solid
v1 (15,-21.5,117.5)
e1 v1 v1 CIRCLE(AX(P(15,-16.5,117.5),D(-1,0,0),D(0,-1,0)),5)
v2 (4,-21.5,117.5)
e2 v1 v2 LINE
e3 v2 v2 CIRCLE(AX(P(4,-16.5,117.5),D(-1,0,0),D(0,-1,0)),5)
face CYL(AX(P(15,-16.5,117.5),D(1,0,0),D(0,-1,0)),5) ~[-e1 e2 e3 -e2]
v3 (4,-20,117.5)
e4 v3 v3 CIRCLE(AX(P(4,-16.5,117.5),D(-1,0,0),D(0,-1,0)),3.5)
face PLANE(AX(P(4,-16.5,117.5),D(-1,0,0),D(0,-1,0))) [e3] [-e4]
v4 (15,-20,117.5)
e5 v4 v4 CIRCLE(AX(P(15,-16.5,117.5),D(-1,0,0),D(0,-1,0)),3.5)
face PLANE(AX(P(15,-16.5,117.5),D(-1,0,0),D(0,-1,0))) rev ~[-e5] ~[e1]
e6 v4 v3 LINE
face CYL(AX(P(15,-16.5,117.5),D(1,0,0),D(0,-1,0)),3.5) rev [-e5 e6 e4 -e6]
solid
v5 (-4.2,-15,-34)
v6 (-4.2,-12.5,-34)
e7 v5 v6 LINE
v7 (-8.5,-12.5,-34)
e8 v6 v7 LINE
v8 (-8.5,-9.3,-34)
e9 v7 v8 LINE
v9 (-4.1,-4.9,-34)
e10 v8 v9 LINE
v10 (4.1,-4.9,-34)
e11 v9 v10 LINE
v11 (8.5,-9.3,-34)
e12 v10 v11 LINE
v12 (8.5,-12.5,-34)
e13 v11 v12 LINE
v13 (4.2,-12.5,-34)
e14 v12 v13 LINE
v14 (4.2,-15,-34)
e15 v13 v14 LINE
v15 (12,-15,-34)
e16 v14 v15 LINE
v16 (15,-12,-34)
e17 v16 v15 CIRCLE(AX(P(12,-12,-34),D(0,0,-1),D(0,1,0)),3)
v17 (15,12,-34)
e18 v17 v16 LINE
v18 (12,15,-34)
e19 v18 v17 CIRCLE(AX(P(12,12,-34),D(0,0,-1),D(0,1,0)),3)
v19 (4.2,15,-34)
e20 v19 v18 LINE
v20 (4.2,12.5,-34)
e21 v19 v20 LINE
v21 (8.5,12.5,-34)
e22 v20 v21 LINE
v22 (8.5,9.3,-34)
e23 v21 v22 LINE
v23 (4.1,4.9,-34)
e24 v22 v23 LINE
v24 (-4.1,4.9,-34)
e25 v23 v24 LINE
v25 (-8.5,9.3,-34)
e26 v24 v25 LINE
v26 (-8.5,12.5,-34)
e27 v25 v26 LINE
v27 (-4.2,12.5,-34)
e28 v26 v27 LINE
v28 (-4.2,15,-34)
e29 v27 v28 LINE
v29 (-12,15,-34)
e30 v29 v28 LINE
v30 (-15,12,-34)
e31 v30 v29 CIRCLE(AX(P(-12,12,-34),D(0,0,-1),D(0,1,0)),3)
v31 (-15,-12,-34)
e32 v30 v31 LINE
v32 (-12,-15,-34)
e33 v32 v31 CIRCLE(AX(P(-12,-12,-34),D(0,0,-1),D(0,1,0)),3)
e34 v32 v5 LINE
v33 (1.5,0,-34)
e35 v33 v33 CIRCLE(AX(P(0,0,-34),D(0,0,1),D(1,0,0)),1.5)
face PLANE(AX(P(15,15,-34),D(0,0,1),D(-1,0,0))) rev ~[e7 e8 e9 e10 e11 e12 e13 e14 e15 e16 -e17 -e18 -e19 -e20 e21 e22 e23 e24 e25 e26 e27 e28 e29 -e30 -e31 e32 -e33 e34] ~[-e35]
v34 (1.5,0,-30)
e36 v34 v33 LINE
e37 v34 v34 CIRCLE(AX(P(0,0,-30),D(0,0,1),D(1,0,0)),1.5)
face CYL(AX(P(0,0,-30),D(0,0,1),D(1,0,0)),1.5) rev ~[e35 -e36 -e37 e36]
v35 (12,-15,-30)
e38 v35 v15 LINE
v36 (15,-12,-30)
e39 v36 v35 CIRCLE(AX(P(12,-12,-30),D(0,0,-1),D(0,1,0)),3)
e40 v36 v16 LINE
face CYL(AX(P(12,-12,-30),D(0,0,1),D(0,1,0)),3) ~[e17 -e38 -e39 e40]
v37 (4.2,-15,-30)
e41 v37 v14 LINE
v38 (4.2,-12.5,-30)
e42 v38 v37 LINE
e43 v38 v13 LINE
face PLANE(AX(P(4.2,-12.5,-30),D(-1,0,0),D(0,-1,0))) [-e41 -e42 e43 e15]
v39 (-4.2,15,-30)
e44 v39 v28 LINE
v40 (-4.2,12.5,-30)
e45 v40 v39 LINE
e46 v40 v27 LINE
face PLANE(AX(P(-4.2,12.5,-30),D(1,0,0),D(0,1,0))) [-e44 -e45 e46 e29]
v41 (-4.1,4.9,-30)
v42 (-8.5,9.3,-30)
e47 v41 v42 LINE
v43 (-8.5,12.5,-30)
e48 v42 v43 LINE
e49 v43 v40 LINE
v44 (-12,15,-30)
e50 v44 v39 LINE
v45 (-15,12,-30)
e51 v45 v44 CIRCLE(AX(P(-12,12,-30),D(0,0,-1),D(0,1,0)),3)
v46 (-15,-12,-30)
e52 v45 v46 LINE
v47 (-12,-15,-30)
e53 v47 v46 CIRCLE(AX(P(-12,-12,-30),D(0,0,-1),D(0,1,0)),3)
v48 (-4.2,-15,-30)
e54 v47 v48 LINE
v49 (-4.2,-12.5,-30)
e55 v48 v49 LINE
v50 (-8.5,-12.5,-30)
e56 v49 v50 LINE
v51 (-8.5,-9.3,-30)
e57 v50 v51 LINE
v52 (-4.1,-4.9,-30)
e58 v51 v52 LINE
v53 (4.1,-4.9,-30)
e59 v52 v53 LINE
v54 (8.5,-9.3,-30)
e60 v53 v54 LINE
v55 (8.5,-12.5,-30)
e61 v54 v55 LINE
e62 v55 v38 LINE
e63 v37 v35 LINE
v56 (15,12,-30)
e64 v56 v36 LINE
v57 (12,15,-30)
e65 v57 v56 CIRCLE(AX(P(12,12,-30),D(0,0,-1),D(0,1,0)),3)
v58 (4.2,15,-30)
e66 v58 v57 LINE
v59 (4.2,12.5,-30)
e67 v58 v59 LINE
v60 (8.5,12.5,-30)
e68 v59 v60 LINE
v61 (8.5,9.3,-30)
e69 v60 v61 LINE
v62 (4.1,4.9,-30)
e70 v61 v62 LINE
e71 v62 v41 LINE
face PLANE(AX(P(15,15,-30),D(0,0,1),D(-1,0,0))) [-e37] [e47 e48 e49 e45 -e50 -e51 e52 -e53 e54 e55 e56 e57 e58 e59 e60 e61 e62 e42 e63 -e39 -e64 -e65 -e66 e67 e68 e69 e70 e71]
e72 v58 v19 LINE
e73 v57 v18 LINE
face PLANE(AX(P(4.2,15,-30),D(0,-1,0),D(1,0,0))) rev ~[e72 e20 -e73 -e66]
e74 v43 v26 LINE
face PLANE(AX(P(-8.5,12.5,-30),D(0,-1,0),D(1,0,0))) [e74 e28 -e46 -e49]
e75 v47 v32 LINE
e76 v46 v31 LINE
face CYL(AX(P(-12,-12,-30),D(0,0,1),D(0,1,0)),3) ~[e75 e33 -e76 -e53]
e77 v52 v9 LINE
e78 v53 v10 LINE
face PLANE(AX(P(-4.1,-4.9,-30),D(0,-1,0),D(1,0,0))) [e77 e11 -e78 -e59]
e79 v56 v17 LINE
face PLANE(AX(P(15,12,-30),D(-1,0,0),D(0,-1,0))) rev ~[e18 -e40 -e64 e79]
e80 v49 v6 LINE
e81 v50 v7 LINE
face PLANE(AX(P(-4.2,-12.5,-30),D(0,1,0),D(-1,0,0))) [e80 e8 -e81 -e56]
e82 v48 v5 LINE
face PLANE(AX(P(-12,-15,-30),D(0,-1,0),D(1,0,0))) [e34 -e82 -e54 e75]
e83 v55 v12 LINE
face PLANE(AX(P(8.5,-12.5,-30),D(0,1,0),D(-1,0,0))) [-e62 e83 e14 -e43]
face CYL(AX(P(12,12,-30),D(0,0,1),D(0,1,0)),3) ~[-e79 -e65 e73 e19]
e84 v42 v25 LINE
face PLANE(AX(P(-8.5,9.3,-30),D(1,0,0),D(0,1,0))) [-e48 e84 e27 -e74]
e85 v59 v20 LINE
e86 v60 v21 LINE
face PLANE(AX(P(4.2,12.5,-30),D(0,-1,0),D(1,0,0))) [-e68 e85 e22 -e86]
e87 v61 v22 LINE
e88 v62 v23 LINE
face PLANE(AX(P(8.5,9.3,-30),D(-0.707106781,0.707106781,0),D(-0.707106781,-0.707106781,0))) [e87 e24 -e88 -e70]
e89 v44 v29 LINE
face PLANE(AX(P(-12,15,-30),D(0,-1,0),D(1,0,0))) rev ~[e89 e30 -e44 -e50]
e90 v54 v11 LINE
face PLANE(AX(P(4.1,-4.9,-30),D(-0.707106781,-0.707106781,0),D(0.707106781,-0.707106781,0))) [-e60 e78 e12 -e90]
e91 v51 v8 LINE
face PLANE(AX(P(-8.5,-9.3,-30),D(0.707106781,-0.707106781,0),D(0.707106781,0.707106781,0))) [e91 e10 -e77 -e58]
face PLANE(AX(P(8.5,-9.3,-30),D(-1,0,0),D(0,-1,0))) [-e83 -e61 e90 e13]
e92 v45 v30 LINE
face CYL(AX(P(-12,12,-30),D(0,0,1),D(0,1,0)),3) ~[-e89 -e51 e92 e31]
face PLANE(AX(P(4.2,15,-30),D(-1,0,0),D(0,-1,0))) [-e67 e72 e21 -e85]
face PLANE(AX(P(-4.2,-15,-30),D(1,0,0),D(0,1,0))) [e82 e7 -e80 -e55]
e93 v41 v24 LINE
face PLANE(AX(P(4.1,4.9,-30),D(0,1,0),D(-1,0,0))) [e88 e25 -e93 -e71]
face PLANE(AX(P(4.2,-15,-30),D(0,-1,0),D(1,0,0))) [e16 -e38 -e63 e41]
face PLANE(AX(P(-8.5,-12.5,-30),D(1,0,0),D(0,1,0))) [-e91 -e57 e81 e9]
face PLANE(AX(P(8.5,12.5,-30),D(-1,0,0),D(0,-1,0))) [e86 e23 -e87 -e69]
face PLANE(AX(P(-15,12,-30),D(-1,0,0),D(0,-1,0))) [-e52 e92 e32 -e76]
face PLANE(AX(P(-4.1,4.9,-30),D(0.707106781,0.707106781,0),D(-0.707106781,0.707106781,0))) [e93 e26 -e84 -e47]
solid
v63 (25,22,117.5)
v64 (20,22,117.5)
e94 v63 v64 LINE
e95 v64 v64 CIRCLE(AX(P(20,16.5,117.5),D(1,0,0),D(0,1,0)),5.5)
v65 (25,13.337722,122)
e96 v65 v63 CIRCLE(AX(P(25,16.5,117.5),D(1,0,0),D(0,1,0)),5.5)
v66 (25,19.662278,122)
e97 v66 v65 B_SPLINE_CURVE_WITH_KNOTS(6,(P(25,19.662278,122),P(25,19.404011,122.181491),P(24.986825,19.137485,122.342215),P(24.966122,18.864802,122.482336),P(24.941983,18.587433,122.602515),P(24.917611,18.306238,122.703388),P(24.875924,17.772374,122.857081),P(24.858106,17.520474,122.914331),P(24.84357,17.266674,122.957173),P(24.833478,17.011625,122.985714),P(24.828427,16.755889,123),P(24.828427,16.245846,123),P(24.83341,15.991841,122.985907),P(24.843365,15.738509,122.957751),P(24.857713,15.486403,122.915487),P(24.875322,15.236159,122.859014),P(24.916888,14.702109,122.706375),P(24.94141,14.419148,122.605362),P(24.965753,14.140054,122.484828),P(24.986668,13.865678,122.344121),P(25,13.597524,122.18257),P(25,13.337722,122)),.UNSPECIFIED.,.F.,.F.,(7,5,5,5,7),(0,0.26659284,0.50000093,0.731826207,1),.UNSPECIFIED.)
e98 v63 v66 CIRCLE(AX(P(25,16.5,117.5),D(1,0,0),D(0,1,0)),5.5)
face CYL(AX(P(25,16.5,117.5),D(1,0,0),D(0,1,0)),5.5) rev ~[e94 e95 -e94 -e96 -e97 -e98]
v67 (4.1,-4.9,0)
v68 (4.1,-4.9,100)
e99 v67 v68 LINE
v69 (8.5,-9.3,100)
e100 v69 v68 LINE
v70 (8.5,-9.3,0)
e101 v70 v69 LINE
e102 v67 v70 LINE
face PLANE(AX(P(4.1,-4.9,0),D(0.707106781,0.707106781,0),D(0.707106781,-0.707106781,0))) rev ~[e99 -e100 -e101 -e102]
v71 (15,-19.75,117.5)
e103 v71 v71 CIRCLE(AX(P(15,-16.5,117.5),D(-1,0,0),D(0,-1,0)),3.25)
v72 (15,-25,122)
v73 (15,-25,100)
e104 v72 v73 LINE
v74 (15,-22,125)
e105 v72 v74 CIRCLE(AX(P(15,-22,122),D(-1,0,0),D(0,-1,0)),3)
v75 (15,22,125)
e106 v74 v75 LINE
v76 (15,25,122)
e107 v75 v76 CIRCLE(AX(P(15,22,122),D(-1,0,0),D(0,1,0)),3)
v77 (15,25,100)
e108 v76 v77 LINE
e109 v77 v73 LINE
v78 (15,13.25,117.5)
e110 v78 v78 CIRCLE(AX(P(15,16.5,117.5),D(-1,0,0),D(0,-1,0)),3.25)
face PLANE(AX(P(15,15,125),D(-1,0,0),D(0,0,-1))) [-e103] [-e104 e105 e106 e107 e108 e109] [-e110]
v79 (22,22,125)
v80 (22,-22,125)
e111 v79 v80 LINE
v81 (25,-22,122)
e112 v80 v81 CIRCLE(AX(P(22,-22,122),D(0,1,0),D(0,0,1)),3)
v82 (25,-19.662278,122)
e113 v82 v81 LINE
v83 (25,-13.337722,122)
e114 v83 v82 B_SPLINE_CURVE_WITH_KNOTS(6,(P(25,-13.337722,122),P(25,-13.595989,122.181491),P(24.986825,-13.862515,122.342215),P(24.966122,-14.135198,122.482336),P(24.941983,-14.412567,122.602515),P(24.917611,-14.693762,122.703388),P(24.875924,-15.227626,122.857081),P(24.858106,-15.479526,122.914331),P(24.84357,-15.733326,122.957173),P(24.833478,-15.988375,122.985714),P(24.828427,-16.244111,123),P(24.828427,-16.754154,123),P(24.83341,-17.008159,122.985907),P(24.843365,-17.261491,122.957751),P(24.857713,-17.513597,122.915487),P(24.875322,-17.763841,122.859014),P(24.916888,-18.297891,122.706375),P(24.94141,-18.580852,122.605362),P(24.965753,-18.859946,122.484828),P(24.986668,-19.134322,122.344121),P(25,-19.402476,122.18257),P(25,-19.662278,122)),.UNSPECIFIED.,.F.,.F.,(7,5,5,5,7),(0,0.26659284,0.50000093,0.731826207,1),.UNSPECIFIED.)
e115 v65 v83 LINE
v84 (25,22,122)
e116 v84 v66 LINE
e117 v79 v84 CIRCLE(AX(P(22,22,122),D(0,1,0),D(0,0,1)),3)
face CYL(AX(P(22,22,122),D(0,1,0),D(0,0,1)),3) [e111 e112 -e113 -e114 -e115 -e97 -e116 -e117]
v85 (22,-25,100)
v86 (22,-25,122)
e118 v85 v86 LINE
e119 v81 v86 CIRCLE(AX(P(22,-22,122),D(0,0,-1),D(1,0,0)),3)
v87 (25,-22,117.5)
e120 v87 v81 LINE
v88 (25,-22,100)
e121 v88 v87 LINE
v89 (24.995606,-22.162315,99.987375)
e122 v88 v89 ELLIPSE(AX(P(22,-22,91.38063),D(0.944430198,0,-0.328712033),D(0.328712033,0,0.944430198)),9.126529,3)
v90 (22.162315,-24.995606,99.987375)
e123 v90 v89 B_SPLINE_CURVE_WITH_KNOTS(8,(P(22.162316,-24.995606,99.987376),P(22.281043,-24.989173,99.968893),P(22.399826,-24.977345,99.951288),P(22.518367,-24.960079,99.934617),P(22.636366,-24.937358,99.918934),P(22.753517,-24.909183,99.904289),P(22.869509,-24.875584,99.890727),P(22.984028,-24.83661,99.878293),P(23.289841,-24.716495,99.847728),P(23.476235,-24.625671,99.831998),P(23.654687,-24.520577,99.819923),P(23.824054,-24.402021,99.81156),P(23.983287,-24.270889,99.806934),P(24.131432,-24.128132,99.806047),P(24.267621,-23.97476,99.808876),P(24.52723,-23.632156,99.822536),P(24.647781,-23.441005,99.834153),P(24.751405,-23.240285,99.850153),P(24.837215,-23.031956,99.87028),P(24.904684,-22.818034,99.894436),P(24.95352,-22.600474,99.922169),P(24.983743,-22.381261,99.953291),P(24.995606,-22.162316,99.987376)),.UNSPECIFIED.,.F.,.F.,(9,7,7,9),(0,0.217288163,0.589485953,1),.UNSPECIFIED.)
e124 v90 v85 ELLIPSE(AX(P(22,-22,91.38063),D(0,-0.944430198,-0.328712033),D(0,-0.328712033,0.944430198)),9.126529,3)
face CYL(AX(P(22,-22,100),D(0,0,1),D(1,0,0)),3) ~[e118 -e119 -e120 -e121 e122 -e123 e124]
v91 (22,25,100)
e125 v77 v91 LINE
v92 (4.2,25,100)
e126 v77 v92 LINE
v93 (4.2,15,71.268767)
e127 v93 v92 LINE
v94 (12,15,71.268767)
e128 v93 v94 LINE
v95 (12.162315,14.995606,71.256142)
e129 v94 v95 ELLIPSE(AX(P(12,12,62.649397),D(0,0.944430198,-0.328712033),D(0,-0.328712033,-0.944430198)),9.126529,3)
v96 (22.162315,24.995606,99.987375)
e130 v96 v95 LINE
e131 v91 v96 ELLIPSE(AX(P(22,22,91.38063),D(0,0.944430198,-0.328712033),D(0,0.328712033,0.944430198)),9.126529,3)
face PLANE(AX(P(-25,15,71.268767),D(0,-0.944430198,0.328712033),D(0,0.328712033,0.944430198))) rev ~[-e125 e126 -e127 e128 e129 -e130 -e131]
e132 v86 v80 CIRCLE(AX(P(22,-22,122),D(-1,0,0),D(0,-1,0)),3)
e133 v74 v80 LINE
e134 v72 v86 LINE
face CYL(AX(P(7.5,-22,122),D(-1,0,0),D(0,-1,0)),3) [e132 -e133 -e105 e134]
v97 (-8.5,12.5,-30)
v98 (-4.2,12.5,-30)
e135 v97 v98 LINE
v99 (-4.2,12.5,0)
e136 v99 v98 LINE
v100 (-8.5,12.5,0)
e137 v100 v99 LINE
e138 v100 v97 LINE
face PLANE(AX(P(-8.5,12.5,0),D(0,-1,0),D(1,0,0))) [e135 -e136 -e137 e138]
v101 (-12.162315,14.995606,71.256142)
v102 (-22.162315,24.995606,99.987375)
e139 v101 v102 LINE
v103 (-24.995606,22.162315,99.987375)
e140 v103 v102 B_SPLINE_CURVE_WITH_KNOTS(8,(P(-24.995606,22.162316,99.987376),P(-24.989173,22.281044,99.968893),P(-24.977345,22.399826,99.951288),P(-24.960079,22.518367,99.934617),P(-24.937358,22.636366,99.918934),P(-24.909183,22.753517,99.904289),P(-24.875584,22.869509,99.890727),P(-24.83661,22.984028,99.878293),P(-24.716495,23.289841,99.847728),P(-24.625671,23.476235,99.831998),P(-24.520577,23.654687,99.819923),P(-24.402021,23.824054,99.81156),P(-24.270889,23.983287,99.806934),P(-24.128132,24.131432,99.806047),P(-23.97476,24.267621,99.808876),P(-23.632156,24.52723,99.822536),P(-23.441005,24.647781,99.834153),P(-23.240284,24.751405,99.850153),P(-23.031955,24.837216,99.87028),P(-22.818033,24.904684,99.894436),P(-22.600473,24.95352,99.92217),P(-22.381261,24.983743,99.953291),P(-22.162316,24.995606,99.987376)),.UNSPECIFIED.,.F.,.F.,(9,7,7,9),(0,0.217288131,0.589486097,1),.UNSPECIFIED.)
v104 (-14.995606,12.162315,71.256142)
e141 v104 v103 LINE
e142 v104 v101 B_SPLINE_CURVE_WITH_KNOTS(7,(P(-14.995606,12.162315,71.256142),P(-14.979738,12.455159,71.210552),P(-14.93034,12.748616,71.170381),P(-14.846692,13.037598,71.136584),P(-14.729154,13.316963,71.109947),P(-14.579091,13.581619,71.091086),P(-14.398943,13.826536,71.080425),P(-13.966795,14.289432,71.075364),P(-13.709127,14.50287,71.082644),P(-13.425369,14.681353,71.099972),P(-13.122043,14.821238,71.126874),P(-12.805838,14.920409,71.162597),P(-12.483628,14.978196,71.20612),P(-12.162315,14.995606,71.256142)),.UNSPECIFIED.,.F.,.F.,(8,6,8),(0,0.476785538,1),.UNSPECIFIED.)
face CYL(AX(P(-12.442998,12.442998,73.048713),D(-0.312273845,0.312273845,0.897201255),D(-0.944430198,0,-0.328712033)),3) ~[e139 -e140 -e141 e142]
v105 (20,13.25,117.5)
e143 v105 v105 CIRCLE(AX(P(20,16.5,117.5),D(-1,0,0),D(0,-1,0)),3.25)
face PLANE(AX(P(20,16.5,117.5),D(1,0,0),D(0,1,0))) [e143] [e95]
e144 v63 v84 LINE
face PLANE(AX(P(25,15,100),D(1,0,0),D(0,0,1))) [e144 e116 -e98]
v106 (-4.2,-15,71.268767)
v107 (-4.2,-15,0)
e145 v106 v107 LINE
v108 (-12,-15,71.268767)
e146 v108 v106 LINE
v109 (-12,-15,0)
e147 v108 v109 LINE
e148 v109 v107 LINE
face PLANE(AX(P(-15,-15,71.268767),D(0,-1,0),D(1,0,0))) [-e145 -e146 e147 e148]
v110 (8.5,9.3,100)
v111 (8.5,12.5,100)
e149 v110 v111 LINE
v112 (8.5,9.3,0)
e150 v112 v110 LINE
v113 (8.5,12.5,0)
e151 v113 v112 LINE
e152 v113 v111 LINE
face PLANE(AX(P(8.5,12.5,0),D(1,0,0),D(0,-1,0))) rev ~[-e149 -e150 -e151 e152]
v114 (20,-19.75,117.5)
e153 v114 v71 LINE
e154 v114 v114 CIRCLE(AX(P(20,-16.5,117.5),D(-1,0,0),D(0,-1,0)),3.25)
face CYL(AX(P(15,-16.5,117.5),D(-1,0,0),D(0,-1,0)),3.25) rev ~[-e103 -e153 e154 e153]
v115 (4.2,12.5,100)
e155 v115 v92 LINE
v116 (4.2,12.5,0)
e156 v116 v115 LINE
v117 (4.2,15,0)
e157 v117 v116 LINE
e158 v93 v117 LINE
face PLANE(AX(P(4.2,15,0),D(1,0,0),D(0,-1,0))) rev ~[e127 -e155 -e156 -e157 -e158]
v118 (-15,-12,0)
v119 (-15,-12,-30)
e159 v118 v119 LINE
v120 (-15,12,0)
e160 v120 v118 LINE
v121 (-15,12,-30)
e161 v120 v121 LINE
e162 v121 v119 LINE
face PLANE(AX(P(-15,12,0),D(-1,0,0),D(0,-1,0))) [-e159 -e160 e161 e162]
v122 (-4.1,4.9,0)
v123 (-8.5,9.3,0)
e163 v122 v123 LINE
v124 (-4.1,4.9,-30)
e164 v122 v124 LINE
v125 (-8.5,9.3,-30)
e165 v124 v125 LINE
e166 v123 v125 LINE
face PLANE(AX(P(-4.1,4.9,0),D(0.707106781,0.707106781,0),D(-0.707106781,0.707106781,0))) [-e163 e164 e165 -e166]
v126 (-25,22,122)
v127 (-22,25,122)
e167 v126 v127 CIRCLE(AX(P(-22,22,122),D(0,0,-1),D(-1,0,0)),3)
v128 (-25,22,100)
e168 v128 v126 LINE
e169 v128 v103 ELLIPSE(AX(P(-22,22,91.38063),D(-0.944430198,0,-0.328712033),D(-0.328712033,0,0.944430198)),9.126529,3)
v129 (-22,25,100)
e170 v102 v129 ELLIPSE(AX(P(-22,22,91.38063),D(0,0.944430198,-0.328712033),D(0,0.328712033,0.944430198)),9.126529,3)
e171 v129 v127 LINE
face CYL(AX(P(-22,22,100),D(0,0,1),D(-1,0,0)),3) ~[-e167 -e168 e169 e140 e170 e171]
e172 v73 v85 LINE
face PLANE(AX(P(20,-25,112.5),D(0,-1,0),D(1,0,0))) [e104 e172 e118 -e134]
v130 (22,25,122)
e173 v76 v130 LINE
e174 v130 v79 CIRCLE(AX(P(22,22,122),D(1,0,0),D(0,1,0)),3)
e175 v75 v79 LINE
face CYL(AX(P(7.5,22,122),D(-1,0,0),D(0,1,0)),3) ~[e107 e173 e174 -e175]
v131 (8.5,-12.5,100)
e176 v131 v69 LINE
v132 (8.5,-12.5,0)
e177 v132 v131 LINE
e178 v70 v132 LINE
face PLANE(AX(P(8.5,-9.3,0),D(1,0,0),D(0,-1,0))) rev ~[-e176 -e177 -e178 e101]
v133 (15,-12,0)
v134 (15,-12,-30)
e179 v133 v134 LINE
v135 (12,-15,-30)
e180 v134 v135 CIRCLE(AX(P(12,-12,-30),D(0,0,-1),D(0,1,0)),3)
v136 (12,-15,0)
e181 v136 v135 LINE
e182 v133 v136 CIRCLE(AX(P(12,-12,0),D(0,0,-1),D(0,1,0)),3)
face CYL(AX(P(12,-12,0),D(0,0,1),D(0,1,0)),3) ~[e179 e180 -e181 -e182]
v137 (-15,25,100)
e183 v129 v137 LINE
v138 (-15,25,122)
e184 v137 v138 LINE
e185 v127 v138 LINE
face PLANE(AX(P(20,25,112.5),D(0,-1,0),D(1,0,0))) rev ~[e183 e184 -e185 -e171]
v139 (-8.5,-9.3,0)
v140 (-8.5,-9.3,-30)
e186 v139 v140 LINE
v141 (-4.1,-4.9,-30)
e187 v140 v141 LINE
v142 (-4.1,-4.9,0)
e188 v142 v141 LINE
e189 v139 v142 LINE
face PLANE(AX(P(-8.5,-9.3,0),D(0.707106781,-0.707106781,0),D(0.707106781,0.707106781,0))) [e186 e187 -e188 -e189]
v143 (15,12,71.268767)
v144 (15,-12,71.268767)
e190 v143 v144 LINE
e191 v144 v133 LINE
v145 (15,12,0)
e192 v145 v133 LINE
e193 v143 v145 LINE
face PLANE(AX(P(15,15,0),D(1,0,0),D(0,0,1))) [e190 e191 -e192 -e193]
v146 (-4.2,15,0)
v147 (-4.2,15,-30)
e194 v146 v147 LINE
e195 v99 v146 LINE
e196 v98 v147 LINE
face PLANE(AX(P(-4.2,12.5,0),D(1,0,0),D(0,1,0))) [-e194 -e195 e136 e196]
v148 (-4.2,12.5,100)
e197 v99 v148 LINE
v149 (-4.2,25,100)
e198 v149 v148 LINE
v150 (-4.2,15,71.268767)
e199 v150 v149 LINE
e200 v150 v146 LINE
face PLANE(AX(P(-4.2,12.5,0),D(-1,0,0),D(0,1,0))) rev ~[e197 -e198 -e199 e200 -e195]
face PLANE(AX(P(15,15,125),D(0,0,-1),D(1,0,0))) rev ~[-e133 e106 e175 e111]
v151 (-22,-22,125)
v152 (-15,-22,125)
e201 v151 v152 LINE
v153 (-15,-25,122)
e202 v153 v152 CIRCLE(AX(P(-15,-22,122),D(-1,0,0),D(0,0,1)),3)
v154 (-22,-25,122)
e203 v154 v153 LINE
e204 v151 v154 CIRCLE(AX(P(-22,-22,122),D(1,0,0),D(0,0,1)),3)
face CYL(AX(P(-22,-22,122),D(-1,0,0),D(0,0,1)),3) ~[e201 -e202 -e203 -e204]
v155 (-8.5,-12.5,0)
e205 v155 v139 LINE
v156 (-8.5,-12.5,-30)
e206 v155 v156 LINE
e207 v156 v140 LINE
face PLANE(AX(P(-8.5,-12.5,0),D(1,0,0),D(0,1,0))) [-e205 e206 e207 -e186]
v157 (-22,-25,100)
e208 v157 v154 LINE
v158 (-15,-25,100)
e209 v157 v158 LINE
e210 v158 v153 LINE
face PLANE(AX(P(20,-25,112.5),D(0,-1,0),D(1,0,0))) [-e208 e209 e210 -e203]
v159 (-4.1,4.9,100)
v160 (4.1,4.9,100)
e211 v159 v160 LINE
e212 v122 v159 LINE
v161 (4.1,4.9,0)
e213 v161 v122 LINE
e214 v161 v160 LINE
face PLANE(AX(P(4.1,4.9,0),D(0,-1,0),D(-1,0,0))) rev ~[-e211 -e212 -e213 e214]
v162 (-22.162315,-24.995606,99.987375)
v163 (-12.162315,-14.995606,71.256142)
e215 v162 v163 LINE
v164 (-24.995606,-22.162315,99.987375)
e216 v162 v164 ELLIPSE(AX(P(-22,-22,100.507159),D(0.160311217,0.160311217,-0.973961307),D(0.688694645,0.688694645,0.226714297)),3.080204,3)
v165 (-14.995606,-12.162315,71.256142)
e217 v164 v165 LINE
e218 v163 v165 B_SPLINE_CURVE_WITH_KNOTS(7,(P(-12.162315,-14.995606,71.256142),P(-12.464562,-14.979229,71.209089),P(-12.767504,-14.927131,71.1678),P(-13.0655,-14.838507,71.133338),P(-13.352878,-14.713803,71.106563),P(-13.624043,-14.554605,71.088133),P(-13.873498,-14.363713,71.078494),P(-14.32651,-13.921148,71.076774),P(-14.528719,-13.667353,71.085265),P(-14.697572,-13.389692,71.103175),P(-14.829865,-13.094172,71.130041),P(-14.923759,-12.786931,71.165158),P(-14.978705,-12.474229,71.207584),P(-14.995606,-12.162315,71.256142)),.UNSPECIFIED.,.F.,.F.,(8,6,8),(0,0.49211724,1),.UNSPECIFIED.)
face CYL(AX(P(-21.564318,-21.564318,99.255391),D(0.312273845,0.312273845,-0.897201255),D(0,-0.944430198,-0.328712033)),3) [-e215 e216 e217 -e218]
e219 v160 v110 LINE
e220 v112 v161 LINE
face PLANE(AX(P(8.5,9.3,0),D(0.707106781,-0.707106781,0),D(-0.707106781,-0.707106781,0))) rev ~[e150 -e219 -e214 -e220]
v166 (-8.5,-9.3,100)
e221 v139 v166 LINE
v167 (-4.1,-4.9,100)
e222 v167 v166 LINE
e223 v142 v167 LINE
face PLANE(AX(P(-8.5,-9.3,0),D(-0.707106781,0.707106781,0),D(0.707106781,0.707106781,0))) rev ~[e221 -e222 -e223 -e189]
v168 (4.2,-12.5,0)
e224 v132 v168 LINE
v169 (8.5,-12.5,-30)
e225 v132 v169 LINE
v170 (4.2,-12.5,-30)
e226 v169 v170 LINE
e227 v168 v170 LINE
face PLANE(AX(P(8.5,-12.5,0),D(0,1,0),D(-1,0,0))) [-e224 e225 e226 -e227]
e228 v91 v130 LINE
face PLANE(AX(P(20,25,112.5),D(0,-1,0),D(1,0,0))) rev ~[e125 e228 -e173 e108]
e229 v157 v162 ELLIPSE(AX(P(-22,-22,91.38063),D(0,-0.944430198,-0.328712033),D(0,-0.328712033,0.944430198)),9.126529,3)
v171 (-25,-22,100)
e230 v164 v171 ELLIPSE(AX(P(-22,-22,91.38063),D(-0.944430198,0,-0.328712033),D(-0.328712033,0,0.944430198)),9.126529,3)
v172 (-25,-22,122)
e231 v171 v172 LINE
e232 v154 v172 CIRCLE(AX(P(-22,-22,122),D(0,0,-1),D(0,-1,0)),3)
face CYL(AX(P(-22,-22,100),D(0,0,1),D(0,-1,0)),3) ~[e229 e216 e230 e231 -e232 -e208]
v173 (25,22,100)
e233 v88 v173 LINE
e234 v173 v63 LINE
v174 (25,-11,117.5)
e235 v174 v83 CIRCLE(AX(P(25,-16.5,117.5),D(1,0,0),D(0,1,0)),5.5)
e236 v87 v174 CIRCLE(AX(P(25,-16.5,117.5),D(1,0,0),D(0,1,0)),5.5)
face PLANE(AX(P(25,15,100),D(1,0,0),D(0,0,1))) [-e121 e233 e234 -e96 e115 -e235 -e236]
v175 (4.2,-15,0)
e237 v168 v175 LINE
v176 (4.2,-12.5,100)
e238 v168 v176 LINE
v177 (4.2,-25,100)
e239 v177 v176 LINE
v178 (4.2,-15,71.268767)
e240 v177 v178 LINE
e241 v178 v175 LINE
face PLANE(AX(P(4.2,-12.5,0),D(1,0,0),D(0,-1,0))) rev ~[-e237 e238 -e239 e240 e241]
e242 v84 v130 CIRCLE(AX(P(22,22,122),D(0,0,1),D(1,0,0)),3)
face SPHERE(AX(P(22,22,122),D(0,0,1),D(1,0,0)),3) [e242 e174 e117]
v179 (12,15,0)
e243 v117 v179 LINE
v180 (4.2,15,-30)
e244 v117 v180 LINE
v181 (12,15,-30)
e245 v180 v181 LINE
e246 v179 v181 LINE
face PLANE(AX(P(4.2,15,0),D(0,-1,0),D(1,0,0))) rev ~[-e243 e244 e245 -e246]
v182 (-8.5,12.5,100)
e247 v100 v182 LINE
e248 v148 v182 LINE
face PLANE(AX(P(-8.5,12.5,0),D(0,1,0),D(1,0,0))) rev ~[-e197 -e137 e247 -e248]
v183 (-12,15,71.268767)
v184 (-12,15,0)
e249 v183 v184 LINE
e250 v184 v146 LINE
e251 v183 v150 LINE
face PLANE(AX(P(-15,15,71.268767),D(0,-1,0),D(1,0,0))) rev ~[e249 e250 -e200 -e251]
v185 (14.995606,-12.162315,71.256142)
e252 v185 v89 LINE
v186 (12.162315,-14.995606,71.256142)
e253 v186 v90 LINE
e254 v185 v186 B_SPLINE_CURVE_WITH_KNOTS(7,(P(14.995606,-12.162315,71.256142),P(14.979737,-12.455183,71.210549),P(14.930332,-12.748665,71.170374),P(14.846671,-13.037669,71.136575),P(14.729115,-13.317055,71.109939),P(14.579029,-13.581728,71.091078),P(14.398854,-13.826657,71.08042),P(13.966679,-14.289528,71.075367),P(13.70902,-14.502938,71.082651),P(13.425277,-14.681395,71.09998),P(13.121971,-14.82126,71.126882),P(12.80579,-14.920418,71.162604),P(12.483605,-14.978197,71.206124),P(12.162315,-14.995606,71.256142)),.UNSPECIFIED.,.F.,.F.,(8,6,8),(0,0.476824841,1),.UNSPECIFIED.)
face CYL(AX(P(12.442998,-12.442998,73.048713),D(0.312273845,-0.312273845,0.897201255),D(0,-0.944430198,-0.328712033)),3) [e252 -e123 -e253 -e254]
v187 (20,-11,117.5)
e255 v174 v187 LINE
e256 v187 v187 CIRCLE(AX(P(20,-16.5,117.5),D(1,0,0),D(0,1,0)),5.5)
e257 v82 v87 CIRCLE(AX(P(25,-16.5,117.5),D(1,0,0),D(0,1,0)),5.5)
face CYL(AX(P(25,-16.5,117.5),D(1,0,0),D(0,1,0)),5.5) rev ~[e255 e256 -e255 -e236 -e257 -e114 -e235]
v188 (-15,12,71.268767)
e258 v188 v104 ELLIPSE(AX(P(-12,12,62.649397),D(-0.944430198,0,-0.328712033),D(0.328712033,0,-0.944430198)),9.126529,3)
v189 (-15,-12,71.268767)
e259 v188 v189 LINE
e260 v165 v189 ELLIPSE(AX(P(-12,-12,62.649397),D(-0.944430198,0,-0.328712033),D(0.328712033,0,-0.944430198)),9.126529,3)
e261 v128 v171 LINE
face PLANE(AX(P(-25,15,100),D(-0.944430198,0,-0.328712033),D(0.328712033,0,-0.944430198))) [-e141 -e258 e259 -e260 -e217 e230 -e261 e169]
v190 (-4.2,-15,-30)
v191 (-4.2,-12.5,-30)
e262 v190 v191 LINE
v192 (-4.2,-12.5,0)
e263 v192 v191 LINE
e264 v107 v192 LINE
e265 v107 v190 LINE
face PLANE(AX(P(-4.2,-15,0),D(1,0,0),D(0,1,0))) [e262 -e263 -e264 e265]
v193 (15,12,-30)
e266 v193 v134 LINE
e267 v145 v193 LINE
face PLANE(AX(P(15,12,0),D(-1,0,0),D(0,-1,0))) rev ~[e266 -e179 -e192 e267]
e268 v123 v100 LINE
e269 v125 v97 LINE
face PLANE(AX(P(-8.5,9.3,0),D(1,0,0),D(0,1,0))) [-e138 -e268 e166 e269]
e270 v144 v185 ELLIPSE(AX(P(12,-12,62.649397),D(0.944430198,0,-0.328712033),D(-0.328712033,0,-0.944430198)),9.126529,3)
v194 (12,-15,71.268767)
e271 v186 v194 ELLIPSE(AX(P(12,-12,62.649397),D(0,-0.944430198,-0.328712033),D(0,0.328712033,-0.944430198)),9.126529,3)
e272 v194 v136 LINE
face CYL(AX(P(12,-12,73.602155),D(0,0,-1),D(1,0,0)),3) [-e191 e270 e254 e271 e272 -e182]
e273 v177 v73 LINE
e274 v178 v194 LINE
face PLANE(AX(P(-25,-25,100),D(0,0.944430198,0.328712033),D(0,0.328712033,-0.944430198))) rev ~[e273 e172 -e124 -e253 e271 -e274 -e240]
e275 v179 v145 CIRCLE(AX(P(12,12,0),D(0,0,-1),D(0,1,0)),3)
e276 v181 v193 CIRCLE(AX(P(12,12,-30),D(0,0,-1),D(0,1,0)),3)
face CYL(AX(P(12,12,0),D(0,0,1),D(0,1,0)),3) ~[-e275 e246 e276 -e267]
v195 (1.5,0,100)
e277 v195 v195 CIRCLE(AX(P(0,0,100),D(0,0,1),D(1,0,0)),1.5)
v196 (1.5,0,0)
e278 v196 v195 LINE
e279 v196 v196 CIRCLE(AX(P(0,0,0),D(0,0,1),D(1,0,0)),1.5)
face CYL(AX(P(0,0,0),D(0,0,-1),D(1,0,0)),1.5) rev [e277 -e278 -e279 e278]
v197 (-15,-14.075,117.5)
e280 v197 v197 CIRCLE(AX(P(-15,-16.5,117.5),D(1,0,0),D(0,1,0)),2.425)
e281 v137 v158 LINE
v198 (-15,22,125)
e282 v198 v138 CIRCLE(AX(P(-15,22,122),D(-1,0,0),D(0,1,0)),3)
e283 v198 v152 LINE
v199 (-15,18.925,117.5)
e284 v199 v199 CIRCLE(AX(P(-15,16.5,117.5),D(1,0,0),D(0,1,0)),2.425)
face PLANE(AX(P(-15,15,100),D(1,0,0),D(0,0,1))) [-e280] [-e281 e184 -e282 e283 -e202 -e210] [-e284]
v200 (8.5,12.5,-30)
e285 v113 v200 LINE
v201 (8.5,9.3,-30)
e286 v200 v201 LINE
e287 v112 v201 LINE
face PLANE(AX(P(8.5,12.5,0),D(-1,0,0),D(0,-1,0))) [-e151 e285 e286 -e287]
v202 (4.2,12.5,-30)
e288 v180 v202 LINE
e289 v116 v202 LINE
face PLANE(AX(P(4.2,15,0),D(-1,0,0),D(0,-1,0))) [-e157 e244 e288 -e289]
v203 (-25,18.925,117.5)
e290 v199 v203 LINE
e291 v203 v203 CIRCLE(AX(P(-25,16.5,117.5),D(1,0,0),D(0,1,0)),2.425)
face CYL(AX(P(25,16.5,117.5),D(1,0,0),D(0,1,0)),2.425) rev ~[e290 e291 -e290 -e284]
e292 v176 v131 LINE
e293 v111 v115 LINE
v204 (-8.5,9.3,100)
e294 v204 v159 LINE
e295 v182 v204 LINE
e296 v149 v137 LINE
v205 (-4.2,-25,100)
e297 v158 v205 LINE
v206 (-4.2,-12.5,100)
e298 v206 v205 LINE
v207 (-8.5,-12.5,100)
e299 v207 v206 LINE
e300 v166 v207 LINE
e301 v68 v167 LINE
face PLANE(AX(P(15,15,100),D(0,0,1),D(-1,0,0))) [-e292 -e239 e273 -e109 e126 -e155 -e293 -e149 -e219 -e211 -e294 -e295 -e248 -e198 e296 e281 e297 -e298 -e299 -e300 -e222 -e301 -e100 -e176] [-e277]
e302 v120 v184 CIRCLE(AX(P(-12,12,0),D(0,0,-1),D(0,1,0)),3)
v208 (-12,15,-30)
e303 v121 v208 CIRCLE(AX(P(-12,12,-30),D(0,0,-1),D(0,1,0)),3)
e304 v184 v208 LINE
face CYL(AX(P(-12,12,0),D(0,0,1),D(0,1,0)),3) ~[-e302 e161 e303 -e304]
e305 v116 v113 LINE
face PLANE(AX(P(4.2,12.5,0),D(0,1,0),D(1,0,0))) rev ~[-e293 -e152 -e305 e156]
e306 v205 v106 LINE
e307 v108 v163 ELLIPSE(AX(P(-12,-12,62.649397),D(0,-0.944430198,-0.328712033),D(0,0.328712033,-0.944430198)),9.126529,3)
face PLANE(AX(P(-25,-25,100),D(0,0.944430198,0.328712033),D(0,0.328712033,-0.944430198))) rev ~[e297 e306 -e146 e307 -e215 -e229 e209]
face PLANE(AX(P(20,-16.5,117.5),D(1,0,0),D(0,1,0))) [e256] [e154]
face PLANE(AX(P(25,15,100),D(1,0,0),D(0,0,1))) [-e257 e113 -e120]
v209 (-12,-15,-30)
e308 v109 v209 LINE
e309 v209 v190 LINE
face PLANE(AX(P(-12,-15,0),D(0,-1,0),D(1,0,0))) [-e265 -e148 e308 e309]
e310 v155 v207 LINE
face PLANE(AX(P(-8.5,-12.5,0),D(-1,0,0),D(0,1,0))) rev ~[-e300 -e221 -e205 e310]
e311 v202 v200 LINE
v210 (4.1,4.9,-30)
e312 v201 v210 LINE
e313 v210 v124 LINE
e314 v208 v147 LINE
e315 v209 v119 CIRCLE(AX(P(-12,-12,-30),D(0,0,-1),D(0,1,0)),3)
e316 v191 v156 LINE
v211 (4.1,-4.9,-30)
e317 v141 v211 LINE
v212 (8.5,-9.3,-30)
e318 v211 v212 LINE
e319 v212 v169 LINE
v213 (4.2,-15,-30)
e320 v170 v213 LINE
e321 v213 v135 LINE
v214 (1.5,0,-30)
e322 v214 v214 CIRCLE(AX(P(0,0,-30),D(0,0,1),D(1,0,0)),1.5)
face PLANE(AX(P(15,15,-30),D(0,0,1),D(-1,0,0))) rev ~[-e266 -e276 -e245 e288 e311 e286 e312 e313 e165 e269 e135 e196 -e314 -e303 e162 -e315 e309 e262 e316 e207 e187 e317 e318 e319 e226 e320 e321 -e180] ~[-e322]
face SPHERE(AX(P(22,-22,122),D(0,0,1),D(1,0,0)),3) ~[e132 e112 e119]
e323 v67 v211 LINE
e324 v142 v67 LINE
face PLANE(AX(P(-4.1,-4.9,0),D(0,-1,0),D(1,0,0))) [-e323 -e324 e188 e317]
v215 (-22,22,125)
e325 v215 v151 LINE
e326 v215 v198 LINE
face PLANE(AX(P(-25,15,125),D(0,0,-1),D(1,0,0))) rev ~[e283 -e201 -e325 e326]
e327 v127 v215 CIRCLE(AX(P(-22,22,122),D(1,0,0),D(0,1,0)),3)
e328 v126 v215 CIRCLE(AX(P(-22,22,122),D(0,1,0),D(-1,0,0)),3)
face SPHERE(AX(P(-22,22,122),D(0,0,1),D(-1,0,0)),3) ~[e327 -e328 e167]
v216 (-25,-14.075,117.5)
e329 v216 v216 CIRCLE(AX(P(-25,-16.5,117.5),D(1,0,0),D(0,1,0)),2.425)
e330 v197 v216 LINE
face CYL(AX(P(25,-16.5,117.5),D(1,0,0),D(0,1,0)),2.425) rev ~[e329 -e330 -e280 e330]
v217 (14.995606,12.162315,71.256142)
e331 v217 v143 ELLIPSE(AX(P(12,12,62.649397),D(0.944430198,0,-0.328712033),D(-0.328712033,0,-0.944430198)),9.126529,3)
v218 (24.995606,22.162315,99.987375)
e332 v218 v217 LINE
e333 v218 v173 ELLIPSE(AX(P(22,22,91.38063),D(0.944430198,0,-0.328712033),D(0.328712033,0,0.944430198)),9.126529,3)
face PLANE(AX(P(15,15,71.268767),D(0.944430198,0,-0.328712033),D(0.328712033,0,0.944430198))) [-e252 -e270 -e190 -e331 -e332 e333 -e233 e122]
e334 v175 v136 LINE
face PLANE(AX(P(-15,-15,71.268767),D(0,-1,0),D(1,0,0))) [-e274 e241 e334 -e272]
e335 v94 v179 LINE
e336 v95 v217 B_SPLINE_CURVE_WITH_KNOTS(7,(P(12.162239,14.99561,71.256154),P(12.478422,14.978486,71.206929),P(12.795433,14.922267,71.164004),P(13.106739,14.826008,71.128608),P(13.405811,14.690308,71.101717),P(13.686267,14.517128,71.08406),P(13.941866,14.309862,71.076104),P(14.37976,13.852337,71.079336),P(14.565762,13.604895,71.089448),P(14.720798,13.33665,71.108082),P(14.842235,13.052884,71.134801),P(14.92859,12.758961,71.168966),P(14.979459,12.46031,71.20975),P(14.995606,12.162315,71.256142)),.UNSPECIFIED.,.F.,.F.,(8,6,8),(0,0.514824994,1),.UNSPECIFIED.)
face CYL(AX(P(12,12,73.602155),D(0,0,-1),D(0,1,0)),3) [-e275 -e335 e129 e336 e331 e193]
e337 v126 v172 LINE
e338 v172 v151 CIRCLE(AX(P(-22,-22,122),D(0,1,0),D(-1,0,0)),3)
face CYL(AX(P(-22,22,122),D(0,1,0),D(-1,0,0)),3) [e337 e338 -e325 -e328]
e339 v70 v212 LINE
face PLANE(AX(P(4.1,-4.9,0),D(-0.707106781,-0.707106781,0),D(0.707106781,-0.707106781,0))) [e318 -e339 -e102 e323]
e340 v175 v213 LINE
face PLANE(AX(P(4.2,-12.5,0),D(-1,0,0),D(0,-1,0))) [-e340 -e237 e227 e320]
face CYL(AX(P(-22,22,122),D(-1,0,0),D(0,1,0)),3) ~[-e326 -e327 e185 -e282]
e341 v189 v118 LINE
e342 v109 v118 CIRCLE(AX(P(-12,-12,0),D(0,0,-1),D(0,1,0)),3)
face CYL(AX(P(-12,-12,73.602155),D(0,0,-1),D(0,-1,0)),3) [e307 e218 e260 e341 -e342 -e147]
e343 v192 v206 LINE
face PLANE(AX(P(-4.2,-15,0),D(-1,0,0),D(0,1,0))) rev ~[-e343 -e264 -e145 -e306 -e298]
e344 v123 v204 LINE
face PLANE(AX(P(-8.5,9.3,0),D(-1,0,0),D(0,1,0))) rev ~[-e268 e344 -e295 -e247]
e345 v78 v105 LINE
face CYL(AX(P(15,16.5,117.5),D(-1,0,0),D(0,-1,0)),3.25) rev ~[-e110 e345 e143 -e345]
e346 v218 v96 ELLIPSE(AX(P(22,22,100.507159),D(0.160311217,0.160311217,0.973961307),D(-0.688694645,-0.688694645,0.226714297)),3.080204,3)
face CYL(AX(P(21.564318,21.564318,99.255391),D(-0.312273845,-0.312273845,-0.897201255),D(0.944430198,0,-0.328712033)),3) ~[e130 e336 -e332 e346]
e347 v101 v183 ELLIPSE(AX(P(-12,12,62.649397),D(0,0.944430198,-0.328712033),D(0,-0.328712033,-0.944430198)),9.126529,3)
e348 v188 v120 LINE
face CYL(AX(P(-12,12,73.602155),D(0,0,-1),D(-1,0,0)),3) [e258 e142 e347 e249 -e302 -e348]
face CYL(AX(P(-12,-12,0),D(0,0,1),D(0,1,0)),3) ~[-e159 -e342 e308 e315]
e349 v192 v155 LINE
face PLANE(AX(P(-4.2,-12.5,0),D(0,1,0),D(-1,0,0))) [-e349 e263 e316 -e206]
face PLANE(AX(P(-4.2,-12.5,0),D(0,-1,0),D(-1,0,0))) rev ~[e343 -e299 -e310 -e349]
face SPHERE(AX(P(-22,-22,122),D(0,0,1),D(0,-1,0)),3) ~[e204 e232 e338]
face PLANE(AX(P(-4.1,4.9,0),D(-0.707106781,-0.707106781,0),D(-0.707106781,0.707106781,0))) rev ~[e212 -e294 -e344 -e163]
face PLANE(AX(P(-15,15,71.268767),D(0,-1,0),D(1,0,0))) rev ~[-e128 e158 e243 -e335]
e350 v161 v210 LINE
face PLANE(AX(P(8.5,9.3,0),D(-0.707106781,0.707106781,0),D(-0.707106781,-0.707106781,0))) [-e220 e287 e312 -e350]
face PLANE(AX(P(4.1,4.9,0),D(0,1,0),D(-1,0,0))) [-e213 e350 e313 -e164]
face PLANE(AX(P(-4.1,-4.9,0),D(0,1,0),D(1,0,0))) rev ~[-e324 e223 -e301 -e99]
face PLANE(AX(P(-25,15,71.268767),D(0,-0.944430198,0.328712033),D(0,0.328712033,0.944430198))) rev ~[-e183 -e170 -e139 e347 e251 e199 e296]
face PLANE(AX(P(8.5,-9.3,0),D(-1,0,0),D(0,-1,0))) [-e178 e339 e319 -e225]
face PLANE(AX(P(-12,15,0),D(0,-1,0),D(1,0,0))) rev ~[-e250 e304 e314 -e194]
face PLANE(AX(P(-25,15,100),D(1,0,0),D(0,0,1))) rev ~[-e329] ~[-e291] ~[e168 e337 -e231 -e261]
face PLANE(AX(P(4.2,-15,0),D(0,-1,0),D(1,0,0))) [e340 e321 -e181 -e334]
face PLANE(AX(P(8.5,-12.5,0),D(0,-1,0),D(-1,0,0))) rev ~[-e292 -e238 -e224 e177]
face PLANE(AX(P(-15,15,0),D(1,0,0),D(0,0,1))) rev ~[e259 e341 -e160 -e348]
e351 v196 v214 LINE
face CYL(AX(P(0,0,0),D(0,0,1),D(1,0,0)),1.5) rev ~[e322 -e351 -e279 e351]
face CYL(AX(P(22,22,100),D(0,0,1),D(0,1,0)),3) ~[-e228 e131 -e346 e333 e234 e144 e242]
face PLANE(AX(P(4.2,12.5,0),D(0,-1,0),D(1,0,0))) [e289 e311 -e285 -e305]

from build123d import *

# Parameters (mm, degrees)
F0_R          = 1.5
F1_DEPTH      = 100
F2_W          = 10
F2_H          = 25
F3_DEPTH      = 30
F4_DEPTH      = 10
F5_DEPTH      = 10
F7_DEPTH      = 132
F8_DEPTH      = 110
F9_F1_R       = 3
F9_F2_R       = 3
F9_F3_R       = 3
F9_F4_R       = 3
F9_F5_R       = 3
F9_F6_R       = 3
F9_F7_R       = 3
F9_F8_R       = 3
F9_F9_R       = 3
F9_F10_R      = 3
F9_F11_R      = 3
F9_F12_R      = 3
F10_R         = 3.25
F11_DEPTH     = 15
F12_R         = 2.425
F13_DEPTH     = 80
F14_R         = 5.5
F15_DEPTH     = 5
F17_DEPTH     = 124
F18_W         = 8.4
F18_H         = 10
F19_DEPTH     = 30
F20_DEPTH     = 30
F21_T1_DEPTH  = 14.5
F21_T3_DEPTH  = 14.5
F21_T5_DEPTH  = 44
F21_T8_ANGLE  = 90
F21_T10_ANGLE = 90
F21_T12_ANGLE = 90
F21_T14_ANGLE = 90
F22_R         = 5
F22_R_2       = 3.5
F23_DEPTH     = 11
F24_DEPTH     = 4


# Not quite as in the source:
# - a fillet or chamfer that OpenCascade refuses, or shapes differently, is made with other operations: its cross-section is extruded or revolved along the edge and cut away or added


with BuildPart() as f1:
    # F0 (on Top) → F1 (new body)
    with BuildSketch(Plane.XY):
        Polygon((-12, -15), (12, -15), (15, -15), (15, -12), (15, 12), (15, 15), (12, 15), (-12, 15), (-15, 15), (-15, 12), (-15, -12), (-15, -15), align=None)
        Circle(F0_R, mode=Mode.SUBTRACT)
    extrude(amount=F1_DEPTH)

    # F2 (on face) → F3 (join, through all)
    with BuildSketch(Plane.XZ.offset(15)):
        with Locations((20, 112.5)):
            Rectangle(F2_W, F2_H)
        Polygon((25, 100), (15, 100), (15, 71.2687671185), align=None)
        Polygon((-15, 71.2687671185), (-15, 100), (-25, 100), align=None)
        with Locations((-20, 112.5)):
            Rectangle(F2_W, F2_H)
    extrude(amount=-F3_DEPTH)

    # F4 (add): faces of the model
    f4_faces = [f1.faces().sort_by_distance(p)[0] for p in [
        (0, -15, 61.3177895676),
        (0, -15, 61.3177895676),
    ]]
    extrude(f4_faces, amount=F4_DEPTH)

    # F5 (add): faces of the model
    f5_faces = [f1.faces().sort_by_distance(p)[0] for p in [
        (0, 15, 61.3177895676),
        (0, 15, 61.3177895676),
    ]]
    extrude(f5_faces, amount=F5_DEPTH)

    # F6 (on face) → F7 (cut)
    with BuildSketch(Plane(origin=(-25, 0, 0), x_dir=(0, -1, 0), z_dir=(-1, 0, 0))):
        Polygon((25, 100), (15, 71.2687671185), (25, 71.2687671185), align=None)
        Polygon((-25, 71.2687671185), (-15, 71.2687671185), (-25, 100), align=None)
    extrude(amount=-F7_DEPTH, mode=Mode.SUBTRACT)

    # F8 (cut): faces of the model
    f8_faces = [f1.faces().sort_by_distance(p)[0] for p in [
        (0, -20, 71.2687671185),
        (0, 20, 71.2687671185),
    ]]
    extrude(f8_faces, amount=-F8_DEPTH, mode=Mode.SUBTRACT)

    # F9: fillet of radius 3 on 12 edges, made by hand

    # F9_f1
    f9_f1_edges = [f1.edges().sort_by_distance(p)[0] for p in [
        (25, 25, 112.5),
    ]]
    fillet(f9_f1_edges, radius=F9_F1_R)

    # F9_f2
    f9_f2_edges = [f1.edges().sort_by_distance(p)[0] for p in [
        (25, -25, 112.5),
    ]]
    fillet(f9_f2_edges, radius=F9_F2_R)

    # F9_f3
    f9_f3_edges = [f1.edges().sort_by_distance(p)[0] for p in [
        (-25, -25, 112.5),
    ]]
    fillet(f9_f3_edges, radius=F9_F3_R)

    # F9_f4
    f9_f4_edges = [f1.edges().sort_by_distance(p)[0] for p in [
        (-25, 25, 112.5),
    ]]
    fillet(f9_f4_edges, radius=F9_F4_R)

    # F9_f5
    f9_f5_edges = [f1.edges().sort_by_distance(p)[0] for p in [
        (19.5606601718, -19.5606601718, 84.3721060674),
    ]]
    fillet(f9_f5_edges, radius=F9_F5_R)

    # F9_f6
    f9_f6_edges = [f1.edges().sort_by_distance(p)[0] for p in [
        (19.5606601718, 19.5606601718, 84.3721060674),
    ]]
    fillet(f9_f6_edges, radius=F9_F6_R)

    # F9_f7
    f9_f7_edges = [f1.edges().sort_by_distance(p)[0] for p in [
        (-19.5606601718, -19.5606601718, 84.3721060674),
    ]]
    fillet(f9_f7_edges, radius=F9_F7_R)

    # F9_f8
    f9_f8_edges = [f1.edges().sort_by_distance(p)[0] for p in [
        (-19.5606601718, 19.5606601718, 84.3721060674),
    ]]
    fillet(f9_f8_edges, radius=F9_F8_R)

    # F9_f9
    f9_f9_edges = [f1.edges().sort_by_distance(p)[0] for p in [
        (15, 15, 36.8010775644),
    ]]
    fillet(f9_f9_edges, radius=F9_F9_R)

    # F9_f10
    f9_f10_edges = [f1.edges().sort_by_distance(p)[0] for p in [
        (15, -15, 36.8010775644),
    ]]
    fillet(f9_f10_edges, radius=F9_F10_R)

    # F9_f11
    f9_f11_edges = [f1.edges().sort_by_distance(p)[0] for p in [
        (-15, -15, 36.8010775644),
    ]]
    fillet(f9_f11_edges, radius=F9_F11_R)

    # F9_f12
    f9_f12_edges = [f1.edges().sort_by_distance(p)[0] for p in [
        (-15, 15, 36.8010775644),
    ]]
    fillet(f9_f12_edges, radius=F9_F12_R)

    # F10 (on face) → F11 (cut, symmetric)
    with BuildSketch(Plane(origin=(15, 0, 0), x_dir=(0, -1, 0), z_dir=(-1, 0, 0))):
        with Locations((-16.5, 117.5)):
            Circle(F10_R)
        with Locations((16.5, 117.5)):
            Circle(F10_R)
    extrude(amount=F11_DEPTH, both=True, mode=Mode.SUBTRACT)

    # F12 (on face) → F13 (cut)
    with BuildSketch(Plane.YZ.offset(25)):
        with Locations((16.5, 117.5)):
            Circle(F12_R)
        with Locations((-16.5, 117.5)):
            Circle(F12_R)
    extrude(amount=-F13_DEPTH, mode=Mode.SUBTRACT)

    # F14 (on face) → F15 (cut)
    with BuildSketch(Plane.YZ.offset(25)):
        with Locations((-16.5, 117.5)):
            Circle(F14_R)
        with Locations((16.5, 117.5)):
            Circle(F14_R)
    extrude(amount=-F15_DEPTH, mode=Mode.SUBTRACT)

    # F16 (on face) → F17 (cut)
    with BuildSketch(Plane(origin=(0, 0, 0), x_dir=(1, 0, 0), z_dir=(0, 0, -1))):
        Polygon((4.2, 15), (0, 15), (-4.2, 15), (-4.2, 12.5), (-8.5, 12.5), (-8.5, 9.3), (-4.1, 4.9), (0, 4.9), (4.1, 4.9), (8.5, 9.3), (8.5, 12.5), (4.2, 12.5), align=None)
        Polygon((-4.2, -12.5), (-4.2, -15), (0, -15), (4.2, -15), (4.2, -12.5), (8.5, -12.5), (8.5, -9.3), (4.1, -4.9), (0, -4.9), (-4.1, -4.9), (-8.5, -9.3), (-8.5, -12.5), align=None)
    extrude(amount=-F17_DEPTH, mode=Mode.SUBTRACT)

    # F18 (on face) → F19 (cut)
    with BuildSketch(Plane.XY.offset(100)):
        with Locations((0, 20)):
            Rectangle(F18_W, F18_H)
        with Locations((0, -20)):
            Rectangle(F18_W, F18_H)
    extrude(amount=-F19_DEPTH, mode=Mode.SUBTRACT)

    # F20 (add): a face of the model
    f20_faces = [f1.faces().sort_by_distance(p)[0] for p in [
        (-13.8213203436, 13.8213203436, 0),
    ]]
    extrude(f20_faces, amount=F20_DEPTH)

    # F21: fillet of radius 3 on 10 edges, made by hand

    # F21_s2 → F21_t1 (cut)
    with BuildSketch(Plane.YZ.offset(-22)):
        with BuildLine():
            ThreePointArc((-22, 125), (-24.1213203436, 124.1213203436), (-25, 122))
            Line((-25, 122), (-25, 125))
            Line((-25, 125), (-22, 125))
        make_face()
        with BuildLine():
            ThreePointArc((25, 122), (24.1213203436, 124.1213203436), (22, 125))
            Line((22, 125), (25, 125))
            Line((25, 125), (25, 122))
        make_face()
    extrude(amount=F21_T1_DEPTH, mode=Mode.SUBTRACT)

    # F21_s4 → F21_t3 (cut)
    with BuildSketch(Plane.YZ.offset(7.5)):
        with BuildLine():
            ThreePointArc((-25, 122), (-24.1213203436, 124.1213203436), (-22, 125))
            Line((-22, 125), (-25, 125))
            Line((-25, 125), (-25, 122))
        make_face()
        with BuildLine():
            ThreePointArc((25, 122), (24.1213203436, 124.1213203436), (22, 125))
            Line((22, 125), (25, 125))
            Line((25, 125), (25, 122))
        make_face()
    extrude(amount=F21_T3_DEPTH, mode=Mode.SUBTRACT)

    # F21_s6 → F21_t5 (cut)
    with BuildSketch(Plane.XZ.offset(-22)):
        with BuildLine():
            ThreePointArc((-25, 122), (-24.1213203436, 124.1213203436), (-22, 125))
            Line((-22, 125), (-25, 125))
            Line((-25, 125), (-25, 122))
        make_face()
        with BuildLine():
            ThreePointArc((22, 125), (24.1213203436, 124.1213203436), (25, 122))
            Line((25, 122), (25, 125))
            Line((25, 125), (22, 125))
        make_face()
    extrude(amount=F21_T5_DEPTH, mode=Mode.SUBTRACT)

    # F21_s7 → F21_t8 (revolve, cut)
    with BuildSketch(Plane.YZ.offset(-22)):
        with BuildLine():
            ThreePointArc((-25, 122), (-24.1213203436, 124.1213203436), (-22, 125))
            Line((-22, 125), (-25, 125))
            Line((-25, 125), (-25, 122))
        make_face()
    revolve(axis=Axis((-22, -22, 125), (0, 0, -1)), revolution_arc=F21_T8_ANGLE, mode=Mode.SUBTRACT)

    # F21_s9 → F21_t10 (revolve, cut)
    with BuildSketch(Plane.XZ.offset(-22)):
        with BuildLine():
            ThreePointArc((-25, 122), (-24.1213203436, 124.1213203436), (-22, 125))
            Line((-22, 125), (-25, 125))
            Line((-25, 125), (-25, 122))
        make_face()
    revolve(axis=Axis((-22, 22, 125), (0, 0, -1)), revolution_arc=F21_T10_ANGLE, mode=Mode.SUBTRACT)

    # F21_s11 → F21_t12 (revolve, cut)
    with BuildSketch(Plane.XZ.offset(22)):
        with BuildLine():
            ThreePointArc((25, 122), (24.1213203436, 124.1213203436), (22, 125))
            Line((22, 125), (25, 125))
            Line((25, 125), (25, 122))
        make_face()
    revolve(axis=Axis((22, -22, 125), (0, 0, -1)), revolution_arc=F21_T12_ANGLE, mode=Mode.SUBTRACT)

    # F21_s13 → F21_t14 (revolve, cut)
    with BuildSketch(Plane.XZ.offset(-22)):
        with BuildLine():
            ThreePointArc((25, 122), (24.1213203436, 124.1213203436), (22, 125))
            Line((22, 125), (25, 125))
            Line((25, 125), (25, 122))
        make_face()
    revolve(axis=Axis((22, 22, 125), (0, 0, 1)), revolution_arc=F21_T14_ANGLE, mode=Mode.SUBTRACT)


with BuildPart() as f23:
    # F22 (on face) → F23 (new body)
    with BuildSketch(Plane(origin=(15, 0, 0), x_dir=(0, -1, 0), z_dir=(-1, 0, 0))):
        with Locations((16.5, 117.5)):
            Circle(F22_R)
        with Locations((16.5, 117.5)):
            Circle(F22_R_2, mode=Mode.SUBTRACT)
    extrude(amount=F23_DEPTH)


with BuildPart() as f24:
    # F24 (new): a face of the model
    f24_faces = [f1.part.faces().sort_by_distance(p)[0] for p in [
        (-13.8213203436, 13.8213203436, -30),
    ]]
    extrude(f24_faces, amount=F24_DEPTH)


solid = Compound([f1.part, f23.part, f24.part])
